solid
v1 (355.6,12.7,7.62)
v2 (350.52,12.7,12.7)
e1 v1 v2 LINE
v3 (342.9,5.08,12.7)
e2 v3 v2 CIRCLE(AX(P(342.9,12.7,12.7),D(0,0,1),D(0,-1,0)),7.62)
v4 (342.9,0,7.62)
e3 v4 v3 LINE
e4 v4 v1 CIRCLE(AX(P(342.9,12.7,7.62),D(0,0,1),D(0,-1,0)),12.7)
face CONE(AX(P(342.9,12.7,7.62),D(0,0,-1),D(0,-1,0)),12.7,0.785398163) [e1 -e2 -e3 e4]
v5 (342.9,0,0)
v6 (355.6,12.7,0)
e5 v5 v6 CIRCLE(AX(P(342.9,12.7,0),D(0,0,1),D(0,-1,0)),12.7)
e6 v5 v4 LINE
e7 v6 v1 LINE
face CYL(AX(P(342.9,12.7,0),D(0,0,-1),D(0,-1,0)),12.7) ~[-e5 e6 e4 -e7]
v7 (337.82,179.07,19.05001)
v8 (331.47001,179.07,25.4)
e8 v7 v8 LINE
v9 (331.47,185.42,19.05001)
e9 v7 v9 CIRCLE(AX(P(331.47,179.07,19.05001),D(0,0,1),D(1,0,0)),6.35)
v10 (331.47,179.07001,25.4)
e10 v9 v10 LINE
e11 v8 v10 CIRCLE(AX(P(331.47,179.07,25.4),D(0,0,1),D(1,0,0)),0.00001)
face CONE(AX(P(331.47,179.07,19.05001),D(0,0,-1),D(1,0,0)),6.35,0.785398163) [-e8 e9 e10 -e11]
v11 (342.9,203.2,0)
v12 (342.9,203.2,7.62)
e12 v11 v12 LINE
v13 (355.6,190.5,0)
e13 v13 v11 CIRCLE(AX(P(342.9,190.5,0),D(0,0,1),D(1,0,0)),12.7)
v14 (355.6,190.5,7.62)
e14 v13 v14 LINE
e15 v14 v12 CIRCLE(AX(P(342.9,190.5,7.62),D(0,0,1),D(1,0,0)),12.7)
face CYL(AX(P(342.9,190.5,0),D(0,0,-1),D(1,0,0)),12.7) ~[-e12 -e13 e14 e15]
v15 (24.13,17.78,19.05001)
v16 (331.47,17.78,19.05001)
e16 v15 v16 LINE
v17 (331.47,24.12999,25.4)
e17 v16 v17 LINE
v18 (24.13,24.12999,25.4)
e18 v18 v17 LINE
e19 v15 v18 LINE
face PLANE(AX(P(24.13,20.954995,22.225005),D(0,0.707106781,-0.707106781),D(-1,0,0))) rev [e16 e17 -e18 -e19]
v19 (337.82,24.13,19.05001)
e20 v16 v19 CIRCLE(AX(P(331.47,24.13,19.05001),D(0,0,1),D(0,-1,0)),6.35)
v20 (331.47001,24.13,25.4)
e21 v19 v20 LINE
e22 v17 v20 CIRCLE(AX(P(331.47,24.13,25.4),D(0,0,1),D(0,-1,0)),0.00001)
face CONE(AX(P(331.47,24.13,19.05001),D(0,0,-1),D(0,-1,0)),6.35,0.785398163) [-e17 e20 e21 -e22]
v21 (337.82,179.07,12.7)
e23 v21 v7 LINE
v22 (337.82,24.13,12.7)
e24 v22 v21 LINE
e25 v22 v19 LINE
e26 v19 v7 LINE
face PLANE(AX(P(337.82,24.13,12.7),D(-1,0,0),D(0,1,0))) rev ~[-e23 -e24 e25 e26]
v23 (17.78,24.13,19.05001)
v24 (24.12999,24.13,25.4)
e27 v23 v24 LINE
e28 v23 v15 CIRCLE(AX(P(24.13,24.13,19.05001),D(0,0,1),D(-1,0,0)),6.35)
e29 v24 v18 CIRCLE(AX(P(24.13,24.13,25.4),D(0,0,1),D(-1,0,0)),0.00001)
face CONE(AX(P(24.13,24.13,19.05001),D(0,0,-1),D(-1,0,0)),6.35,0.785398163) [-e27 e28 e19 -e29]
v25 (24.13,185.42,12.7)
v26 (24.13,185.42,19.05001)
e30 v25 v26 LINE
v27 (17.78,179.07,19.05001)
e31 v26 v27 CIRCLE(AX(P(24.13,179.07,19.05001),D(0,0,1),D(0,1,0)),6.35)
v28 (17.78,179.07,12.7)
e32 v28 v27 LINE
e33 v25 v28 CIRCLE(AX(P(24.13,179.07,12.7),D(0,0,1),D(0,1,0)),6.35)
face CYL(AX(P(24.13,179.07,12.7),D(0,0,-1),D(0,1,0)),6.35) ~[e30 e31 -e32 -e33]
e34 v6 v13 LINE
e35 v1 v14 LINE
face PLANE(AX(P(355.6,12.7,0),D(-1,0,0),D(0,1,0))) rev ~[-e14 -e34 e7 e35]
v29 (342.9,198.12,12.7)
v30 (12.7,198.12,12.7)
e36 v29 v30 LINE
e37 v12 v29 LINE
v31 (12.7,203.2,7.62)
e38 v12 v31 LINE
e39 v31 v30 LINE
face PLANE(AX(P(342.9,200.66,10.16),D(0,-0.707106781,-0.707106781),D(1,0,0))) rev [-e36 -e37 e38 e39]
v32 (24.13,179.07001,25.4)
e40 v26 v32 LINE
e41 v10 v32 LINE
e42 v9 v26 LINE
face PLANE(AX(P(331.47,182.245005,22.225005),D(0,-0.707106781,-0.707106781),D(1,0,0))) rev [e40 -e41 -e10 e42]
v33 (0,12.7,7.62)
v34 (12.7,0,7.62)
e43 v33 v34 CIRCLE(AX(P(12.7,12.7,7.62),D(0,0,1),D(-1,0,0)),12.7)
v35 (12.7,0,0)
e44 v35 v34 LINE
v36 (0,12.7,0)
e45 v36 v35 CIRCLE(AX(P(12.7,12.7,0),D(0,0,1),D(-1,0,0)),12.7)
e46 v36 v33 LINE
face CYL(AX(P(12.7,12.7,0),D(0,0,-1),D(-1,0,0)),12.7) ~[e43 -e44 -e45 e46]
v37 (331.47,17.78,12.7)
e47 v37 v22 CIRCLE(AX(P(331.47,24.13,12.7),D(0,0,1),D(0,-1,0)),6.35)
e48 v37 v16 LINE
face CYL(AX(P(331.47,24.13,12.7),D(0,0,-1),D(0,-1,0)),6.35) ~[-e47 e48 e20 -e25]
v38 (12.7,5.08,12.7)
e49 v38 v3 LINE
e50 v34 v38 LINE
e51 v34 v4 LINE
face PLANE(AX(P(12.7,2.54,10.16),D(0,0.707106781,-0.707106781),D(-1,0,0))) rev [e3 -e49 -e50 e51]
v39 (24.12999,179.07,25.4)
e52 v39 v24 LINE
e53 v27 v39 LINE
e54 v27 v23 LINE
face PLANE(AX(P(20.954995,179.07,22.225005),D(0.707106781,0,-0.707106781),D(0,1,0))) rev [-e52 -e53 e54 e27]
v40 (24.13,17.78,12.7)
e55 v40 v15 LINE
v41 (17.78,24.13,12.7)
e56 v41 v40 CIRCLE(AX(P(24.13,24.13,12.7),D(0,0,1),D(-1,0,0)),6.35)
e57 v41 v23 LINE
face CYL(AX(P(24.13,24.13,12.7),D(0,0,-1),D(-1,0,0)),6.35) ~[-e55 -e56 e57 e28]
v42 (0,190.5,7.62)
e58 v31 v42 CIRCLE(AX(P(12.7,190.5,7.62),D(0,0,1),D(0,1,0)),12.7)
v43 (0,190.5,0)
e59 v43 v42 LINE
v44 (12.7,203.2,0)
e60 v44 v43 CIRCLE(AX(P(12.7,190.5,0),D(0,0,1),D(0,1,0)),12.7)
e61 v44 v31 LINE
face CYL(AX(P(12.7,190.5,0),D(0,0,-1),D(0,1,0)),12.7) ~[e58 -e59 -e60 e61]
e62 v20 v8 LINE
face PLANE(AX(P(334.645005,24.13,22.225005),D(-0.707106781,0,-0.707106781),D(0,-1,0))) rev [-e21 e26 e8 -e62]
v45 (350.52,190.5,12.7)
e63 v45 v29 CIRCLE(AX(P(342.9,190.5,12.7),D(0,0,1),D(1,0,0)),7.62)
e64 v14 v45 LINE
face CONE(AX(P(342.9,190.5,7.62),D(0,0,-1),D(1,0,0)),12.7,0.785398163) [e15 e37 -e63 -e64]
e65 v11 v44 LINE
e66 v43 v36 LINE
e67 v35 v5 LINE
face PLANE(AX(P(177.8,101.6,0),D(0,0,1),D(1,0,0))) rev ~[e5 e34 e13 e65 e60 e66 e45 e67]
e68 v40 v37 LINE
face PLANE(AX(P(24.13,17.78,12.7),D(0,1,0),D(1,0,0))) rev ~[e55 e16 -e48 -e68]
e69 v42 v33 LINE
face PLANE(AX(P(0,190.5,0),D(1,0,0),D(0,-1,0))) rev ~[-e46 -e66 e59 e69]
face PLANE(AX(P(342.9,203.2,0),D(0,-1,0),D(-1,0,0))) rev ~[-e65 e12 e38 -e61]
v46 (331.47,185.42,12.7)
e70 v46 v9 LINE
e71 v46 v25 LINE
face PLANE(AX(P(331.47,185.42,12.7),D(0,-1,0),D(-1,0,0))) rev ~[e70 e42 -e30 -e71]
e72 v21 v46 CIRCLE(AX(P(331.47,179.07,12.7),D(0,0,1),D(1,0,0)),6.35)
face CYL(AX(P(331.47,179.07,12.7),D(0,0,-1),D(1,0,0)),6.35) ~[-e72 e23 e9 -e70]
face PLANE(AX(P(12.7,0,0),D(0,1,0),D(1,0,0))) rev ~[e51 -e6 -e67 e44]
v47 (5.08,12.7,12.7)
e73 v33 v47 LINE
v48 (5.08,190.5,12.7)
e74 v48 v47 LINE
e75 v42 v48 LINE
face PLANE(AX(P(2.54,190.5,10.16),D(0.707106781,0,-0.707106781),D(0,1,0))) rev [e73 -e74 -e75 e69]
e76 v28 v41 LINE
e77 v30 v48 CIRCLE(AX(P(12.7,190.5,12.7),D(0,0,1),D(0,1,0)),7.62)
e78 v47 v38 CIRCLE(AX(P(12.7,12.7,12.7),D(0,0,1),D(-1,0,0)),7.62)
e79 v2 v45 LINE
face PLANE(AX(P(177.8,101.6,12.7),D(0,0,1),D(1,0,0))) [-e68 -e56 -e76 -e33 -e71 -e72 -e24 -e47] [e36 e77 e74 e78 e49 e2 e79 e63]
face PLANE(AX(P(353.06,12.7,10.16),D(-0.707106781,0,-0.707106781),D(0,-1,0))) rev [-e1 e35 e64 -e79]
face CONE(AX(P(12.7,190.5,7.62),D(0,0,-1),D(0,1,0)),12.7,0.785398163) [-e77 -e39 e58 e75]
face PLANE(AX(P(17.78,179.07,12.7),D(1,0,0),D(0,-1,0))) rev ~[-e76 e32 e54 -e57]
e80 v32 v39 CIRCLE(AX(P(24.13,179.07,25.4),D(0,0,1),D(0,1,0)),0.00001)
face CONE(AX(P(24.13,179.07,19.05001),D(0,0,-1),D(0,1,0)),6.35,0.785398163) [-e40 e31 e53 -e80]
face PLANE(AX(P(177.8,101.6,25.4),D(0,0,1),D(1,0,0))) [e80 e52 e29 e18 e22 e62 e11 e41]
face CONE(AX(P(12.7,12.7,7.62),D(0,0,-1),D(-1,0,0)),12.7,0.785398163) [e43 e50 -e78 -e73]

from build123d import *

# Parameters (mm, degrees)
F1_DEPTH = 12.7
F2_SIZE  = 5.08
F4_DEPTH = 12.7
F5_SIZE  = 6.34999


# Not quite as in the source:
# - a fillet or chamfer is up to 0.001 mm smaller than in the source, because OpenCascade refuses the exact size


with BuildPart() as f1:
    # F0 (on Top) → F1 (new body)
    with BuildSketch(Plane.XY):
        with BuildLine():
            Line((0, 190.5), (0, 12.7))
            ThreePointArc((0, 12.7), (3.7197438789, 3.7197438789), (12.7, 0))
            Line((12.7, 0), (342.9, 0))
            ThreePointArc((342.9, 0), (351.8802561211, 3.7197438789), (355.6, 12.7))
            Line((355.6, 12.7), (355.6, 190.5))
            ThreePointArc((355.6, 190.5), (351.8802561211, 199.4802561211), (342.9, 203.2))
            Line((342.9, 203.2), (12.7, 203.2))
            ThreePointArc((12.7, 203.2), (3.7197438789, 199.4802561211), (0, 190.5))
        make_face()
    extrude(amount=F1_DEPTH)

    # F2
    f2_edges = [f1.edges().sort_by_distance(p)[0] for p in [
        (0, 101.6, 12.7),
    ]]
    chamfer(f2_edges, length=F2_SIZE)

    # F3 (on face) → F4 (join)
    with BuildSketch(Plane.XY.offset(12.7)):
        with BuildLine():
            Line((17.78, 179.07), (17.78, 101.6))
            Line((17.78, 101.6), (17.78, 24.13))
            ThreePointArc((17.78, 24.13), (19.6398719395, 19.6398719395), (24.13, 17.78))
            Line((24.13, 17.78), (177.8, 17.78))
            Line((177.8, 17.78), (331.47, 17.78))
            ThreePointArc((331.47, 17.78), (335.9601280605, 19.6398719395), (337.82, 24.13))
            Line((337.82, 24.13), (337.82, 101.6))
            Line((337.82, 101.6), (337.82, 179.07))
            ThreePointArc((337.82, 179.07), (335.9601280605, 183.5601280605), (331.47, 185.42))
            Line((331.47, 185.42), (177.8, 185.42))
            Line((177.8, 185.42), (24.13, 185.42))
            ThreePointArc((24.13, 185.42), (19.6398719395, 183.5601280605), (17.78, 179.07))
        make_face()
    extrude(amount=F4_DEPTH)

    # F5 (size 6.35 in the source; OpenCascade refuses exactly that, so slightly less here)
    f5_edges = [f1.edges().sort_by_distance(p)[0] for p in [
        (177.8, 17.78, 25.4),
    ]]
    chamfer(f5_edges, length=F5_SIZE)


solid = f1.part
